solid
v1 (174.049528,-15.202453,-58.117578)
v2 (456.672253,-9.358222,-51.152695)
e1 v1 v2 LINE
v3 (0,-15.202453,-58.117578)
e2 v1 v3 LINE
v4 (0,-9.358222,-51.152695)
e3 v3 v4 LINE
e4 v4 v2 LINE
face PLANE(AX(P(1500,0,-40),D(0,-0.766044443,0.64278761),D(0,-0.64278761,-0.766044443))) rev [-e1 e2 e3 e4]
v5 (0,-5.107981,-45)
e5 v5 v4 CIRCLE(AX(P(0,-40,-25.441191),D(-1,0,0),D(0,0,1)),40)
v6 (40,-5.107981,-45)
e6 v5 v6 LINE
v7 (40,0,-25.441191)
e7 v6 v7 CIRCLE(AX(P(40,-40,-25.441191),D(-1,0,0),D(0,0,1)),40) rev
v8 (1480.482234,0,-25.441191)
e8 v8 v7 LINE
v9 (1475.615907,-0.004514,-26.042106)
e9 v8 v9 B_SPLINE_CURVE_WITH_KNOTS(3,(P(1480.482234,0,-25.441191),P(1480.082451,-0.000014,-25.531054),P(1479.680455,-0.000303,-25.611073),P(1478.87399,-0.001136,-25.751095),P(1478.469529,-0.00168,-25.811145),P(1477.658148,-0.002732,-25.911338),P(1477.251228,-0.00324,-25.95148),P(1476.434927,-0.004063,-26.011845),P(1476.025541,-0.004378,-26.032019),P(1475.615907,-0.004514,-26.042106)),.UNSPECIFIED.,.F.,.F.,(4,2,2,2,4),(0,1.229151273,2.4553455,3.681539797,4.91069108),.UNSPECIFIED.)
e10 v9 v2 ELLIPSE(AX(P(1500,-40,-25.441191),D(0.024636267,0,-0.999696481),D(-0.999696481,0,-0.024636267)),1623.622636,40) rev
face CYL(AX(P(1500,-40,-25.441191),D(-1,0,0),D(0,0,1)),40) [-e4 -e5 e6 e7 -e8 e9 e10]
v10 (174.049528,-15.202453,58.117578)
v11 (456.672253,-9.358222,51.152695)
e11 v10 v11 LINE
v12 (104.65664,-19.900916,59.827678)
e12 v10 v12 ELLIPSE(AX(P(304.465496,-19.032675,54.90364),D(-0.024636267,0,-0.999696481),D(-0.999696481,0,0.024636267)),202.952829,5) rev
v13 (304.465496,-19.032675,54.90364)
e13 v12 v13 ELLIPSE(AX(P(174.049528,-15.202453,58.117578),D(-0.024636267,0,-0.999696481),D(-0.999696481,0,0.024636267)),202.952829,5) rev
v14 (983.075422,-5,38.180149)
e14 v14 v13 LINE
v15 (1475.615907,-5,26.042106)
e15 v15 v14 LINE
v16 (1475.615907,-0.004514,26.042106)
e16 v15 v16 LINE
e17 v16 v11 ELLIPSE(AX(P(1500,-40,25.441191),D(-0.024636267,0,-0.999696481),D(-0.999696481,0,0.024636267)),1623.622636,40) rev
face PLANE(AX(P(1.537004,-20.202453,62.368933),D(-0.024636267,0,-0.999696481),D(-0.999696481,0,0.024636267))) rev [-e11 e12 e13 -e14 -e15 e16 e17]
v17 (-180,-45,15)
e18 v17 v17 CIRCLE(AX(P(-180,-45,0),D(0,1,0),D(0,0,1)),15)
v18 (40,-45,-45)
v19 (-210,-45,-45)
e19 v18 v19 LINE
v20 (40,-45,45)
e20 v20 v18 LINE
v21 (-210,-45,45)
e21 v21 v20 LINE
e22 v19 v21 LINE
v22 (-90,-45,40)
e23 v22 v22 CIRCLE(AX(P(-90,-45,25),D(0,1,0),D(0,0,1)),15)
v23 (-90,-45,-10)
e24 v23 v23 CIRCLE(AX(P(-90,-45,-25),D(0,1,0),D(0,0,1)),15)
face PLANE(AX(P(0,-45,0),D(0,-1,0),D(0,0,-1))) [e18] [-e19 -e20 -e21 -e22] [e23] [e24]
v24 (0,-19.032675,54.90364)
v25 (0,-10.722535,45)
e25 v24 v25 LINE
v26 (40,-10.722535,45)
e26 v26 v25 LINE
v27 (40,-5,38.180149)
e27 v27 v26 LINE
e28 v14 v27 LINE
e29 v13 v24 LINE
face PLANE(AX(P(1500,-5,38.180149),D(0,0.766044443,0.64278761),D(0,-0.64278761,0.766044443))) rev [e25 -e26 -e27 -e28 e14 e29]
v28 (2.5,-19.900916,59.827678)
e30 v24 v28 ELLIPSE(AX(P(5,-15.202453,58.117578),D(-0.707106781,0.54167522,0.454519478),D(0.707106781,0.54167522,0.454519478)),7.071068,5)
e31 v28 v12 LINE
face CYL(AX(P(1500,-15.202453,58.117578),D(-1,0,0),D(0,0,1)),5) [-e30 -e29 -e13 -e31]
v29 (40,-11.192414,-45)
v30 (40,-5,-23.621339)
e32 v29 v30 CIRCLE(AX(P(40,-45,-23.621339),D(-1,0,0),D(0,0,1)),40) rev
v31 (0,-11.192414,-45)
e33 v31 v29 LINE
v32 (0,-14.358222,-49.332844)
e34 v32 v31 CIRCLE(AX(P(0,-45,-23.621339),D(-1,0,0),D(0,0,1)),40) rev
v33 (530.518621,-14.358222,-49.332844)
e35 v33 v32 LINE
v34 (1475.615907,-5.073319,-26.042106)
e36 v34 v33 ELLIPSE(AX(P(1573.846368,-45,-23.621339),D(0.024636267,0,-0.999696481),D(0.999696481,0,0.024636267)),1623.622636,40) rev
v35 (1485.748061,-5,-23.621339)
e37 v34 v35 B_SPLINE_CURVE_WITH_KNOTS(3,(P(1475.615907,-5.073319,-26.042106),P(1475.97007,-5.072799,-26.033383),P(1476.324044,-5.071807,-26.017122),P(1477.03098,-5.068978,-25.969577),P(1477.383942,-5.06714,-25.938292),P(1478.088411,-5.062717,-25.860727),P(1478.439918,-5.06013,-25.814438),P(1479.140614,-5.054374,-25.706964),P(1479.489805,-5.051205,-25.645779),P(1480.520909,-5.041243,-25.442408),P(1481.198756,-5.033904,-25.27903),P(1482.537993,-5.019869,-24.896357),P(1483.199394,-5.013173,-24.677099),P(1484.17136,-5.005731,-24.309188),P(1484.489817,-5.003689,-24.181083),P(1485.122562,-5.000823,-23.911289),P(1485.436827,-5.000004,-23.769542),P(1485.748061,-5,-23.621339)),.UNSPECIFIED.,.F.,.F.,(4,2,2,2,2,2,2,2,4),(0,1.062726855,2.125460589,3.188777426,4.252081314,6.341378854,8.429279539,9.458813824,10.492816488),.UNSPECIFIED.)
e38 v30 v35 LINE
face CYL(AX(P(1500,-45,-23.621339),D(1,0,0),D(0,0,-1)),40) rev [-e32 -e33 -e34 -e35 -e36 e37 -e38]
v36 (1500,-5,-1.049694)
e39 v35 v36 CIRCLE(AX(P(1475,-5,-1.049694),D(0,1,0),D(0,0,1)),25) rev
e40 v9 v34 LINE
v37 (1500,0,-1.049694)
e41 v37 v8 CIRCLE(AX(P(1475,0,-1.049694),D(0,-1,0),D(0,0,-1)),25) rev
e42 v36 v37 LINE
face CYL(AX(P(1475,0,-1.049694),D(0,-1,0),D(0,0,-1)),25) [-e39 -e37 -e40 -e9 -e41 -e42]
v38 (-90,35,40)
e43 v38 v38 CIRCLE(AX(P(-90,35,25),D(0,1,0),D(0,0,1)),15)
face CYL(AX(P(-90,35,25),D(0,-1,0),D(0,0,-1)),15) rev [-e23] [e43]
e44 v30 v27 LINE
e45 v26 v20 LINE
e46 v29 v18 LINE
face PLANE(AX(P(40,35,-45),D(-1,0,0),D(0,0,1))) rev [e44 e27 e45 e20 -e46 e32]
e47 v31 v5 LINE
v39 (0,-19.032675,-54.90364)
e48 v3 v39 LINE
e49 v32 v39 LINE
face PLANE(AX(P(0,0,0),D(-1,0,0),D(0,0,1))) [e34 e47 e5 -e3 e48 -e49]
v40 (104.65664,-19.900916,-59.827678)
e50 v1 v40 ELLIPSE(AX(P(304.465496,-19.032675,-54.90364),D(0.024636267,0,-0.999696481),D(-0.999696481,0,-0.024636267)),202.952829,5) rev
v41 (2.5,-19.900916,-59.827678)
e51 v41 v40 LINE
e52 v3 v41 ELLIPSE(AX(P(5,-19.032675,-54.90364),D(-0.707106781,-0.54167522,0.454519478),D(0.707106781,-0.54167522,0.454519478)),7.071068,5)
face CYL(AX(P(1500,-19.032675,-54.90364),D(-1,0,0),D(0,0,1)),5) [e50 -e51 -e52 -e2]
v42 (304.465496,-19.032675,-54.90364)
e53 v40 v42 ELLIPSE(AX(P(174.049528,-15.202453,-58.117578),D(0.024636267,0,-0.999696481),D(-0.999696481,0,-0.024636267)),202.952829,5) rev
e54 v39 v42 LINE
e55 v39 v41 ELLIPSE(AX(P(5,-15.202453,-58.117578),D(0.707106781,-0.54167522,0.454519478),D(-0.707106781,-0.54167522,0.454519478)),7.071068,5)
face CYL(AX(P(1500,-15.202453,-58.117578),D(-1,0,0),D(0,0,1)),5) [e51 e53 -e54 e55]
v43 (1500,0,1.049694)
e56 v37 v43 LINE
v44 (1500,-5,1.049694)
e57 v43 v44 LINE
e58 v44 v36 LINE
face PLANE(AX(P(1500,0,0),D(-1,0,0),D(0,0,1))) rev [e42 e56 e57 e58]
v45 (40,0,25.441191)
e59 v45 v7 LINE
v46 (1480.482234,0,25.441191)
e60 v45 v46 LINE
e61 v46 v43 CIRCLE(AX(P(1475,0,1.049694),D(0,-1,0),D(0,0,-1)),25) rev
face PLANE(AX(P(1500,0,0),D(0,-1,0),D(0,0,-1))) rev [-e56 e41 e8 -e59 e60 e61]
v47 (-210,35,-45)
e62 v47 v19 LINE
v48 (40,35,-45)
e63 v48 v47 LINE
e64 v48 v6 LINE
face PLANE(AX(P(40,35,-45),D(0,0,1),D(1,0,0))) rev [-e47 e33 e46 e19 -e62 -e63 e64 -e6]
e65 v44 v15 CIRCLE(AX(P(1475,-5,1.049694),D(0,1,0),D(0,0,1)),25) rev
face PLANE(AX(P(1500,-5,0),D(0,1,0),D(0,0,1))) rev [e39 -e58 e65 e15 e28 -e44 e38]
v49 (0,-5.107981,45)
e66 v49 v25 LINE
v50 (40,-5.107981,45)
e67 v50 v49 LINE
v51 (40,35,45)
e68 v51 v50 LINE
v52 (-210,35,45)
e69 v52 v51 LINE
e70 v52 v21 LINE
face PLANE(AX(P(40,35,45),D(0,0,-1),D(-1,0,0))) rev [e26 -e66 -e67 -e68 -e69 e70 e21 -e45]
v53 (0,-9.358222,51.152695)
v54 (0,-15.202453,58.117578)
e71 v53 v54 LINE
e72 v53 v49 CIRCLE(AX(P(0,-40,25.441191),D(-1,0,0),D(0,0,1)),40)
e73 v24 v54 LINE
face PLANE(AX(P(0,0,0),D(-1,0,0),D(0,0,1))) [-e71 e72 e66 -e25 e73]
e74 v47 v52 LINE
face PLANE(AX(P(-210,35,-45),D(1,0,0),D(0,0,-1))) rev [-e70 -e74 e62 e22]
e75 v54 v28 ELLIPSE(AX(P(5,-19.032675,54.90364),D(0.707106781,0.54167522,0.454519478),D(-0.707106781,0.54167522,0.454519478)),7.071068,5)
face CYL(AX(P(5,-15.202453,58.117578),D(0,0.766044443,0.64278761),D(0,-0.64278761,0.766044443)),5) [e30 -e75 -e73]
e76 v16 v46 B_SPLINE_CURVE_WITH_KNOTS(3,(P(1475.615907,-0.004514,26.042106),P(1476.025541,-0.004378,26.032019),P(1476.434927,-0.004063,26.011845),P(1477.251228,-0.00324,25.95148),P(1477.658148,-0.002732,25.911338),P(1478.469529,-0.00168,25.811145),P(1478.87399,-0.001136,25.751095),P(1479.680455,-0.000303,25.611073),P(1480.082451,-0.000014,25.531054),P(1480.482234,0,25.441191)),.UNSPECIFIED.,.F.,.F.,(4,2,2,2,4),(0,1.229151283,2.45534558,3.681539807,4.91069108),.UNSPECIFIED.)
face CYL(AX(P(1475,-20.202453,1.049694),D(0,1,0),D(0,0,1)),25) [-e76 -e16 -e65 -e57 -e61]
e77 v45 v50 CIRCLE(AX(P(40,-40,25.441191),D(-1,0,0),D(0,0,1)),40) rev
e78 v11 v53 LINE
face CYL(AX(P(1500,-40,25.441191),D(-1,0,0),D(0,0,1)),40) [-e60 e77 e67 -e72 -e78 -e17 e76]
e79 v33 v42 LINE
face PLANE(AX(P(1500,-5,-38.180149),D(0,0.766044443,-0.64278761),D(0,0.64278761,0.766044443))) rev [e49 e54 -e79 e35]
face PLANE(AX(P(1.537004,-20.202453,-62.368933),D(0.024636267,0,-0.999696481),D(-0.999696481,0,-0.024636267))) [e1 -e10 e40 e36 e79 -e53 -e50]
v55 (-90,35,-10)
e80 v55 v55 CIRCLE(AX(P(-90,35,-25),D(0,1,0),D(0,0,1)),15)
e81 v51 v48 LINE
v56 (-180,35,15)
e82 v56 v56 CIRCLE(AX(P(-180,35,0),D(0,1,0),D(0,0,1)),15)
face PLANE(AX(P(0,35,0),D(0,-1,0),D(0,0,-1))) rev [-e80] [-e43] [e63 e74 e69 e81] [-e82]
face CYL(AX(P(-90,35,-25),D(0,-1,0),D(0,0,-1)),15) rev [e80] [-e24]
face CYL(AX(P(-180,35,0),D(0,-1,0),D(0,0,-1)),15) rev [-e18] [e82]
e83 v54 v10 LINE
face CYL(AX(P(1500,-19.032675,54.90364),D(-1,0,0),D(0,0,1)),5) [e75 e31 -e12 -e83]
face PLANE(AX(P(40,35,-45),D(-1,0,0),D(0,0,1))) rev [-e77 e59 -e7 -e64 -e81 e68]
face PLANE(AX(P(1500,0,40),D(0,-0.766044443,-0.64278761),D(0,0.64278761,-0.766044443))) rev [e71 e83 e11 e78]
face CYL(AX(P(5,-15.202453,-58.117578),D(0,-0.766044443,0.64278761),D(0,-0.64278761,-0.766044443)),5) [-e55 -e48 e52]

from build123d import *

# Parameters (mm, degrees)
BOSS_EXTRUDE1_DEPTH      = 1500
FILLET1_R                = 40
FILLET2_R                = 40
FILLET3_R                = 5
FILLET4_R                = 5
CUT_EXTRUDE1_DEPTH       = 1502.3316039943886
CUT_EXTRUDE1_DEPTH_BACK  = 1502.3316039943886
FILLET5_R                = 25
BOSS_EXTRUDE2_DEPTH      = 35
BOSS_EXTRUDE2_DEPTH_BACK = 45
SKETCH3_R                = 15.000000000000025
SKETCH3_R_2              = 14.999999999999998


with BuildPart() as part:
    # Sketch1 → Boss-Extrude1 (new body)
    with BuildSketch(Plane(origin=(0, 0, 0), x_dir=(0, 0, -1), z_dir=(1, 0, 0))):
        Polygon((0, 0), (40, 0), (61.94779998780638, -18.416390874921095), (58.733861939373675, -22.246613090515982), (38.18014882866898, -5), (0, -5), (-38.18014882866898, -5), (-58.733861939373675, -22.246613090515982), (-61.94779998780638, -18.416390874921095), (-40, 0), align=None)
    extrude(amount=BOSS_EXTRUDE1_DEPTH)

    # Fillet1
    fillet1_edges = [part.edges().sort_by_distance(p)[0] for p in [
        (750, -5, -38.18014882866898),
        (750, 0, 40),
    ]]
    fillet(fillet1_edges, radius=FILLET1_R)

    # Fillet2
    fillet2_edges = [part.edges().sort_by_distance(p)[0] for p in [
        (750, 0, -40),
    ]]
    fillet(fillet2_edges, radius=FILLET2_R)

    # Fillet3
    # the kernel refuses this fillet: 5 mm, written as the material it takes off along each edge
    with BuildSketch(Plane(origin=(0, -8.840835335933875, -69.98264510888814), x_dir=(0, 0.6427876096865403, 0.7660444431189772), z_dir=(0, -0.7660444431189772, 0.6427876096865403))) as fillet3_piece_1:
        with BuildLine():
            CenterArc((FILLET3_R, -FILLET3_R), FILLET3_R, 90, 90)
            Line((-2.28e-15, -FILLET3_R), (0, 0))
            Line((0, 0), (FILLET3_R, 0))
        make_face()
    extrude(amount=30.000000000000007, mode=Mode.SUBTRACT)
    with BuildSketch(Plane(origin=(-12.500000000000002, -18.4163908749211, -61.94779998780638), x_dir=(0, 0.6427876096865406, 0.7660444431189771), z_dir=(1, 0, 0))) as fillet3_piece_2:
        with BuildLine():
            CenterArc((FILLET3_R, FILLET3_R), FILLET3_R, 180, 90)
            Line((1.03e-15, FILLET3_R), (0, 0))
            Line((0, 0), (FILLET3_R, 2.8e-16))
        make_face()
    extrude(amount=1525, mode=Mode.SUBTRACT)
    with BuildSketch(Plane(origin=(-12.500000000000002, -22.246613090515982, -58.733861939373675), x_dir=(0, 0.7660444431189772, -0.6427876096865403), z_dir=(1, 0, 0))) as fillet3_piece_3:
        with BuildLine():
            CenterArc((FILLET3_R, FILLET3_R), FILLET3_R, 180, 90)
            Line((1.1e-16, FILLET3_R), (0, 0))
            Line((0, 0), (FILLET3_R, -6e-17))
        make_face()
    extrude(amount=1525, mode=Mode.SUBTRACT)
    with BuildSketch(Plane(origin=(1500, -8.840835335933875, -69.98264510888814), x_dir=(0, 0.6427876096865403, 0.7660444431189772), z_dir=(0, -0.7660444431189772, 0.6427876096865403))) as fillet3_piece_4:
        with BuildLine():
            CenterArc((FILLET3_R, FILLET3_R), FILLET3_R, 180, 90)
            Line((-2.28e-15, FILLET3_R), (0, 0))
            Line((0, 0), (FILLET3_R, 0))
        make_face()
    extrude(amount=30.000000000000007, mode=Mode.SUBTRACT)

    # Fillet4
    # the kernel refuses this fillet: 5 mm, written as the material it takes off along each edge
    with BuildSketch(Plane(origin=(0, -31.822168629503203, 50.69901681829192), x_dir=(0, 0.6427876096865403, -0.7660444431189772), z_dir=(0, 0.7660444431189772, 0.6427876096865403))) as fillet4_piece_1:
        with BuildLine():
            CenterArc((FILLET4_R, -FILLET4_R), FILLET4_R, 90, 90)
            Line((0, -FILLET4_R), (0, 0))
            Line((0, 0), (FILLET4_R, 0))
        make_face()
    extrude(amount=30.000000000000007, mode=Mode.SUBTRACT)
    with BuildSketch(Plane(origin=(-12.500000000000007, -22.246613090515982, 58.733861939373675), x_dir=(0, 0.7660444431189776, 0.6427876096865399), z_dir=(1, 0, 0))) as fillet4_piece_2:
        with BuildLine():
            CenterArc((FILLET4_R, -FILLET4_R), FILLET4_R, 90.00000000000004, 90)
            Line((5.38e-15, -FILLET4_R), (0, 0))
            Line((0, 0), (FILLET4_R, 2.4e-16))
        make_face()
    extrude(amount=1525, mode=Mode.SUBTRACT)
    with BuildSketch(Plane(origin=(-12.500000000000002, -18.416390874921095, 61.94779998780638), x_dir=(0, 0.6427876096865403, -0.7660444431189772), z_dir=(1, 0, 0))) as fillet4_piece_3:
        with BuildLine():
            CenterArc((FILLET4_R, -FILLET4_R), FILLET4_R, 90, 89.99999999999997)
            Line((2.28e-15, -FILLET4_R), (0, 0))
            Line((0, 0), (FILLET4_R, 1.1e-16))
        make_face()
    extrude(amount=1525, mode=Mode.SUBTRACT)
    with BuildSketch(Plane(origin=(1500, -31.822168629503203, 50.69901681829192), x_dir=(0, 0.6427876096865403, -0.7660444431189772), z_dir=(0, 0.7660444431189772, 0.6427876096865403))) as fillet4_piece_4:
        with BuildLine():
            CenterArc((FILLET4_R, FILLET4_R), FILLET4_R, 180, 90)
            Line((0, FILLET4_R), (0, 0))
            Line((0, 0), (FILLET4_R, 0))
        make_face()
    extrude(amount=30.000000000000007, mode=Mode.SUBTRACT)

    # Sketch2 → Cut-Extrude1 (cut, two sides: drawn at the far end of the back side and taken through both)
    with BuildSketch(Plane(origin=(0, 0, 0), x_dir=(1, 0, 0), z_dir=(0, 1, 0)).offset(-CUT_EXTRUDE1_DEPTH_BACK)):
        Polygon((1500, -59.90363972377879), (1500, -25.441190629351873), (101.5742667563142, -59.90363972377879), align=None)
        Polygon((1500, 59.90363972377879), (1500, 25.441190629351873), (101.57426675631426, 59.90363972377879), align=None)
    extrude(amount=CUT_EXTRUDE1_DEPTH + CUT_EXTRUDE1_DEPTH_BACK, mode=Mode.SUBTRACT)

    # Fillet5
    fillet5_edges = [part.edges().sort_by_distance(p)[0] for p in [
        (1500, -2.5207098367195613, -25.441190629351873),
        (1500, -2.5, 25.441190629351873),
    ]]
    fillet(fillet5_edges, radius=FILLET5_R)

    # Sketch3 → Boss-Extrude2 (add, two sides: drawn at the far end of the back side and taken through both)
    with BuildSketch(Plane(origin=(0, 0, 0), x_dir=(1, 0, 0), z_dir=(0, 1, 0)).offset(-BOSS_EXTRUDE2_DEPTH_BACK)):
        Polygon((39.99999999999999, 45.00000000000001), (-210, 44.99999999999998), (-210, -45.00000000000002), (40.00000000000001, -44.99999999999998), align=None)
        with Locations(Location((-180, -1.78e-15, 0), (0, 0, 270))):
            Circle(SKETCH3_R, mode=Mode.SUBTRACT)
        with Locations(Location((-90, 25, 0), (0, 0, 270))):
            Circle(SKETCH3_R_2, mode=Mode.SUBTRACT)
        with Locations(Location((-90, -25, 0), (0, 0, 270))):
            Circle(SKETCH3_R_2, mode=Mode.SUBTRACT)
    extrude(amount=BOSS_EXTRUDE2_DEPTH + BOSS_EXTRUDE2_DEPTH_BACK)


solid = part.part
